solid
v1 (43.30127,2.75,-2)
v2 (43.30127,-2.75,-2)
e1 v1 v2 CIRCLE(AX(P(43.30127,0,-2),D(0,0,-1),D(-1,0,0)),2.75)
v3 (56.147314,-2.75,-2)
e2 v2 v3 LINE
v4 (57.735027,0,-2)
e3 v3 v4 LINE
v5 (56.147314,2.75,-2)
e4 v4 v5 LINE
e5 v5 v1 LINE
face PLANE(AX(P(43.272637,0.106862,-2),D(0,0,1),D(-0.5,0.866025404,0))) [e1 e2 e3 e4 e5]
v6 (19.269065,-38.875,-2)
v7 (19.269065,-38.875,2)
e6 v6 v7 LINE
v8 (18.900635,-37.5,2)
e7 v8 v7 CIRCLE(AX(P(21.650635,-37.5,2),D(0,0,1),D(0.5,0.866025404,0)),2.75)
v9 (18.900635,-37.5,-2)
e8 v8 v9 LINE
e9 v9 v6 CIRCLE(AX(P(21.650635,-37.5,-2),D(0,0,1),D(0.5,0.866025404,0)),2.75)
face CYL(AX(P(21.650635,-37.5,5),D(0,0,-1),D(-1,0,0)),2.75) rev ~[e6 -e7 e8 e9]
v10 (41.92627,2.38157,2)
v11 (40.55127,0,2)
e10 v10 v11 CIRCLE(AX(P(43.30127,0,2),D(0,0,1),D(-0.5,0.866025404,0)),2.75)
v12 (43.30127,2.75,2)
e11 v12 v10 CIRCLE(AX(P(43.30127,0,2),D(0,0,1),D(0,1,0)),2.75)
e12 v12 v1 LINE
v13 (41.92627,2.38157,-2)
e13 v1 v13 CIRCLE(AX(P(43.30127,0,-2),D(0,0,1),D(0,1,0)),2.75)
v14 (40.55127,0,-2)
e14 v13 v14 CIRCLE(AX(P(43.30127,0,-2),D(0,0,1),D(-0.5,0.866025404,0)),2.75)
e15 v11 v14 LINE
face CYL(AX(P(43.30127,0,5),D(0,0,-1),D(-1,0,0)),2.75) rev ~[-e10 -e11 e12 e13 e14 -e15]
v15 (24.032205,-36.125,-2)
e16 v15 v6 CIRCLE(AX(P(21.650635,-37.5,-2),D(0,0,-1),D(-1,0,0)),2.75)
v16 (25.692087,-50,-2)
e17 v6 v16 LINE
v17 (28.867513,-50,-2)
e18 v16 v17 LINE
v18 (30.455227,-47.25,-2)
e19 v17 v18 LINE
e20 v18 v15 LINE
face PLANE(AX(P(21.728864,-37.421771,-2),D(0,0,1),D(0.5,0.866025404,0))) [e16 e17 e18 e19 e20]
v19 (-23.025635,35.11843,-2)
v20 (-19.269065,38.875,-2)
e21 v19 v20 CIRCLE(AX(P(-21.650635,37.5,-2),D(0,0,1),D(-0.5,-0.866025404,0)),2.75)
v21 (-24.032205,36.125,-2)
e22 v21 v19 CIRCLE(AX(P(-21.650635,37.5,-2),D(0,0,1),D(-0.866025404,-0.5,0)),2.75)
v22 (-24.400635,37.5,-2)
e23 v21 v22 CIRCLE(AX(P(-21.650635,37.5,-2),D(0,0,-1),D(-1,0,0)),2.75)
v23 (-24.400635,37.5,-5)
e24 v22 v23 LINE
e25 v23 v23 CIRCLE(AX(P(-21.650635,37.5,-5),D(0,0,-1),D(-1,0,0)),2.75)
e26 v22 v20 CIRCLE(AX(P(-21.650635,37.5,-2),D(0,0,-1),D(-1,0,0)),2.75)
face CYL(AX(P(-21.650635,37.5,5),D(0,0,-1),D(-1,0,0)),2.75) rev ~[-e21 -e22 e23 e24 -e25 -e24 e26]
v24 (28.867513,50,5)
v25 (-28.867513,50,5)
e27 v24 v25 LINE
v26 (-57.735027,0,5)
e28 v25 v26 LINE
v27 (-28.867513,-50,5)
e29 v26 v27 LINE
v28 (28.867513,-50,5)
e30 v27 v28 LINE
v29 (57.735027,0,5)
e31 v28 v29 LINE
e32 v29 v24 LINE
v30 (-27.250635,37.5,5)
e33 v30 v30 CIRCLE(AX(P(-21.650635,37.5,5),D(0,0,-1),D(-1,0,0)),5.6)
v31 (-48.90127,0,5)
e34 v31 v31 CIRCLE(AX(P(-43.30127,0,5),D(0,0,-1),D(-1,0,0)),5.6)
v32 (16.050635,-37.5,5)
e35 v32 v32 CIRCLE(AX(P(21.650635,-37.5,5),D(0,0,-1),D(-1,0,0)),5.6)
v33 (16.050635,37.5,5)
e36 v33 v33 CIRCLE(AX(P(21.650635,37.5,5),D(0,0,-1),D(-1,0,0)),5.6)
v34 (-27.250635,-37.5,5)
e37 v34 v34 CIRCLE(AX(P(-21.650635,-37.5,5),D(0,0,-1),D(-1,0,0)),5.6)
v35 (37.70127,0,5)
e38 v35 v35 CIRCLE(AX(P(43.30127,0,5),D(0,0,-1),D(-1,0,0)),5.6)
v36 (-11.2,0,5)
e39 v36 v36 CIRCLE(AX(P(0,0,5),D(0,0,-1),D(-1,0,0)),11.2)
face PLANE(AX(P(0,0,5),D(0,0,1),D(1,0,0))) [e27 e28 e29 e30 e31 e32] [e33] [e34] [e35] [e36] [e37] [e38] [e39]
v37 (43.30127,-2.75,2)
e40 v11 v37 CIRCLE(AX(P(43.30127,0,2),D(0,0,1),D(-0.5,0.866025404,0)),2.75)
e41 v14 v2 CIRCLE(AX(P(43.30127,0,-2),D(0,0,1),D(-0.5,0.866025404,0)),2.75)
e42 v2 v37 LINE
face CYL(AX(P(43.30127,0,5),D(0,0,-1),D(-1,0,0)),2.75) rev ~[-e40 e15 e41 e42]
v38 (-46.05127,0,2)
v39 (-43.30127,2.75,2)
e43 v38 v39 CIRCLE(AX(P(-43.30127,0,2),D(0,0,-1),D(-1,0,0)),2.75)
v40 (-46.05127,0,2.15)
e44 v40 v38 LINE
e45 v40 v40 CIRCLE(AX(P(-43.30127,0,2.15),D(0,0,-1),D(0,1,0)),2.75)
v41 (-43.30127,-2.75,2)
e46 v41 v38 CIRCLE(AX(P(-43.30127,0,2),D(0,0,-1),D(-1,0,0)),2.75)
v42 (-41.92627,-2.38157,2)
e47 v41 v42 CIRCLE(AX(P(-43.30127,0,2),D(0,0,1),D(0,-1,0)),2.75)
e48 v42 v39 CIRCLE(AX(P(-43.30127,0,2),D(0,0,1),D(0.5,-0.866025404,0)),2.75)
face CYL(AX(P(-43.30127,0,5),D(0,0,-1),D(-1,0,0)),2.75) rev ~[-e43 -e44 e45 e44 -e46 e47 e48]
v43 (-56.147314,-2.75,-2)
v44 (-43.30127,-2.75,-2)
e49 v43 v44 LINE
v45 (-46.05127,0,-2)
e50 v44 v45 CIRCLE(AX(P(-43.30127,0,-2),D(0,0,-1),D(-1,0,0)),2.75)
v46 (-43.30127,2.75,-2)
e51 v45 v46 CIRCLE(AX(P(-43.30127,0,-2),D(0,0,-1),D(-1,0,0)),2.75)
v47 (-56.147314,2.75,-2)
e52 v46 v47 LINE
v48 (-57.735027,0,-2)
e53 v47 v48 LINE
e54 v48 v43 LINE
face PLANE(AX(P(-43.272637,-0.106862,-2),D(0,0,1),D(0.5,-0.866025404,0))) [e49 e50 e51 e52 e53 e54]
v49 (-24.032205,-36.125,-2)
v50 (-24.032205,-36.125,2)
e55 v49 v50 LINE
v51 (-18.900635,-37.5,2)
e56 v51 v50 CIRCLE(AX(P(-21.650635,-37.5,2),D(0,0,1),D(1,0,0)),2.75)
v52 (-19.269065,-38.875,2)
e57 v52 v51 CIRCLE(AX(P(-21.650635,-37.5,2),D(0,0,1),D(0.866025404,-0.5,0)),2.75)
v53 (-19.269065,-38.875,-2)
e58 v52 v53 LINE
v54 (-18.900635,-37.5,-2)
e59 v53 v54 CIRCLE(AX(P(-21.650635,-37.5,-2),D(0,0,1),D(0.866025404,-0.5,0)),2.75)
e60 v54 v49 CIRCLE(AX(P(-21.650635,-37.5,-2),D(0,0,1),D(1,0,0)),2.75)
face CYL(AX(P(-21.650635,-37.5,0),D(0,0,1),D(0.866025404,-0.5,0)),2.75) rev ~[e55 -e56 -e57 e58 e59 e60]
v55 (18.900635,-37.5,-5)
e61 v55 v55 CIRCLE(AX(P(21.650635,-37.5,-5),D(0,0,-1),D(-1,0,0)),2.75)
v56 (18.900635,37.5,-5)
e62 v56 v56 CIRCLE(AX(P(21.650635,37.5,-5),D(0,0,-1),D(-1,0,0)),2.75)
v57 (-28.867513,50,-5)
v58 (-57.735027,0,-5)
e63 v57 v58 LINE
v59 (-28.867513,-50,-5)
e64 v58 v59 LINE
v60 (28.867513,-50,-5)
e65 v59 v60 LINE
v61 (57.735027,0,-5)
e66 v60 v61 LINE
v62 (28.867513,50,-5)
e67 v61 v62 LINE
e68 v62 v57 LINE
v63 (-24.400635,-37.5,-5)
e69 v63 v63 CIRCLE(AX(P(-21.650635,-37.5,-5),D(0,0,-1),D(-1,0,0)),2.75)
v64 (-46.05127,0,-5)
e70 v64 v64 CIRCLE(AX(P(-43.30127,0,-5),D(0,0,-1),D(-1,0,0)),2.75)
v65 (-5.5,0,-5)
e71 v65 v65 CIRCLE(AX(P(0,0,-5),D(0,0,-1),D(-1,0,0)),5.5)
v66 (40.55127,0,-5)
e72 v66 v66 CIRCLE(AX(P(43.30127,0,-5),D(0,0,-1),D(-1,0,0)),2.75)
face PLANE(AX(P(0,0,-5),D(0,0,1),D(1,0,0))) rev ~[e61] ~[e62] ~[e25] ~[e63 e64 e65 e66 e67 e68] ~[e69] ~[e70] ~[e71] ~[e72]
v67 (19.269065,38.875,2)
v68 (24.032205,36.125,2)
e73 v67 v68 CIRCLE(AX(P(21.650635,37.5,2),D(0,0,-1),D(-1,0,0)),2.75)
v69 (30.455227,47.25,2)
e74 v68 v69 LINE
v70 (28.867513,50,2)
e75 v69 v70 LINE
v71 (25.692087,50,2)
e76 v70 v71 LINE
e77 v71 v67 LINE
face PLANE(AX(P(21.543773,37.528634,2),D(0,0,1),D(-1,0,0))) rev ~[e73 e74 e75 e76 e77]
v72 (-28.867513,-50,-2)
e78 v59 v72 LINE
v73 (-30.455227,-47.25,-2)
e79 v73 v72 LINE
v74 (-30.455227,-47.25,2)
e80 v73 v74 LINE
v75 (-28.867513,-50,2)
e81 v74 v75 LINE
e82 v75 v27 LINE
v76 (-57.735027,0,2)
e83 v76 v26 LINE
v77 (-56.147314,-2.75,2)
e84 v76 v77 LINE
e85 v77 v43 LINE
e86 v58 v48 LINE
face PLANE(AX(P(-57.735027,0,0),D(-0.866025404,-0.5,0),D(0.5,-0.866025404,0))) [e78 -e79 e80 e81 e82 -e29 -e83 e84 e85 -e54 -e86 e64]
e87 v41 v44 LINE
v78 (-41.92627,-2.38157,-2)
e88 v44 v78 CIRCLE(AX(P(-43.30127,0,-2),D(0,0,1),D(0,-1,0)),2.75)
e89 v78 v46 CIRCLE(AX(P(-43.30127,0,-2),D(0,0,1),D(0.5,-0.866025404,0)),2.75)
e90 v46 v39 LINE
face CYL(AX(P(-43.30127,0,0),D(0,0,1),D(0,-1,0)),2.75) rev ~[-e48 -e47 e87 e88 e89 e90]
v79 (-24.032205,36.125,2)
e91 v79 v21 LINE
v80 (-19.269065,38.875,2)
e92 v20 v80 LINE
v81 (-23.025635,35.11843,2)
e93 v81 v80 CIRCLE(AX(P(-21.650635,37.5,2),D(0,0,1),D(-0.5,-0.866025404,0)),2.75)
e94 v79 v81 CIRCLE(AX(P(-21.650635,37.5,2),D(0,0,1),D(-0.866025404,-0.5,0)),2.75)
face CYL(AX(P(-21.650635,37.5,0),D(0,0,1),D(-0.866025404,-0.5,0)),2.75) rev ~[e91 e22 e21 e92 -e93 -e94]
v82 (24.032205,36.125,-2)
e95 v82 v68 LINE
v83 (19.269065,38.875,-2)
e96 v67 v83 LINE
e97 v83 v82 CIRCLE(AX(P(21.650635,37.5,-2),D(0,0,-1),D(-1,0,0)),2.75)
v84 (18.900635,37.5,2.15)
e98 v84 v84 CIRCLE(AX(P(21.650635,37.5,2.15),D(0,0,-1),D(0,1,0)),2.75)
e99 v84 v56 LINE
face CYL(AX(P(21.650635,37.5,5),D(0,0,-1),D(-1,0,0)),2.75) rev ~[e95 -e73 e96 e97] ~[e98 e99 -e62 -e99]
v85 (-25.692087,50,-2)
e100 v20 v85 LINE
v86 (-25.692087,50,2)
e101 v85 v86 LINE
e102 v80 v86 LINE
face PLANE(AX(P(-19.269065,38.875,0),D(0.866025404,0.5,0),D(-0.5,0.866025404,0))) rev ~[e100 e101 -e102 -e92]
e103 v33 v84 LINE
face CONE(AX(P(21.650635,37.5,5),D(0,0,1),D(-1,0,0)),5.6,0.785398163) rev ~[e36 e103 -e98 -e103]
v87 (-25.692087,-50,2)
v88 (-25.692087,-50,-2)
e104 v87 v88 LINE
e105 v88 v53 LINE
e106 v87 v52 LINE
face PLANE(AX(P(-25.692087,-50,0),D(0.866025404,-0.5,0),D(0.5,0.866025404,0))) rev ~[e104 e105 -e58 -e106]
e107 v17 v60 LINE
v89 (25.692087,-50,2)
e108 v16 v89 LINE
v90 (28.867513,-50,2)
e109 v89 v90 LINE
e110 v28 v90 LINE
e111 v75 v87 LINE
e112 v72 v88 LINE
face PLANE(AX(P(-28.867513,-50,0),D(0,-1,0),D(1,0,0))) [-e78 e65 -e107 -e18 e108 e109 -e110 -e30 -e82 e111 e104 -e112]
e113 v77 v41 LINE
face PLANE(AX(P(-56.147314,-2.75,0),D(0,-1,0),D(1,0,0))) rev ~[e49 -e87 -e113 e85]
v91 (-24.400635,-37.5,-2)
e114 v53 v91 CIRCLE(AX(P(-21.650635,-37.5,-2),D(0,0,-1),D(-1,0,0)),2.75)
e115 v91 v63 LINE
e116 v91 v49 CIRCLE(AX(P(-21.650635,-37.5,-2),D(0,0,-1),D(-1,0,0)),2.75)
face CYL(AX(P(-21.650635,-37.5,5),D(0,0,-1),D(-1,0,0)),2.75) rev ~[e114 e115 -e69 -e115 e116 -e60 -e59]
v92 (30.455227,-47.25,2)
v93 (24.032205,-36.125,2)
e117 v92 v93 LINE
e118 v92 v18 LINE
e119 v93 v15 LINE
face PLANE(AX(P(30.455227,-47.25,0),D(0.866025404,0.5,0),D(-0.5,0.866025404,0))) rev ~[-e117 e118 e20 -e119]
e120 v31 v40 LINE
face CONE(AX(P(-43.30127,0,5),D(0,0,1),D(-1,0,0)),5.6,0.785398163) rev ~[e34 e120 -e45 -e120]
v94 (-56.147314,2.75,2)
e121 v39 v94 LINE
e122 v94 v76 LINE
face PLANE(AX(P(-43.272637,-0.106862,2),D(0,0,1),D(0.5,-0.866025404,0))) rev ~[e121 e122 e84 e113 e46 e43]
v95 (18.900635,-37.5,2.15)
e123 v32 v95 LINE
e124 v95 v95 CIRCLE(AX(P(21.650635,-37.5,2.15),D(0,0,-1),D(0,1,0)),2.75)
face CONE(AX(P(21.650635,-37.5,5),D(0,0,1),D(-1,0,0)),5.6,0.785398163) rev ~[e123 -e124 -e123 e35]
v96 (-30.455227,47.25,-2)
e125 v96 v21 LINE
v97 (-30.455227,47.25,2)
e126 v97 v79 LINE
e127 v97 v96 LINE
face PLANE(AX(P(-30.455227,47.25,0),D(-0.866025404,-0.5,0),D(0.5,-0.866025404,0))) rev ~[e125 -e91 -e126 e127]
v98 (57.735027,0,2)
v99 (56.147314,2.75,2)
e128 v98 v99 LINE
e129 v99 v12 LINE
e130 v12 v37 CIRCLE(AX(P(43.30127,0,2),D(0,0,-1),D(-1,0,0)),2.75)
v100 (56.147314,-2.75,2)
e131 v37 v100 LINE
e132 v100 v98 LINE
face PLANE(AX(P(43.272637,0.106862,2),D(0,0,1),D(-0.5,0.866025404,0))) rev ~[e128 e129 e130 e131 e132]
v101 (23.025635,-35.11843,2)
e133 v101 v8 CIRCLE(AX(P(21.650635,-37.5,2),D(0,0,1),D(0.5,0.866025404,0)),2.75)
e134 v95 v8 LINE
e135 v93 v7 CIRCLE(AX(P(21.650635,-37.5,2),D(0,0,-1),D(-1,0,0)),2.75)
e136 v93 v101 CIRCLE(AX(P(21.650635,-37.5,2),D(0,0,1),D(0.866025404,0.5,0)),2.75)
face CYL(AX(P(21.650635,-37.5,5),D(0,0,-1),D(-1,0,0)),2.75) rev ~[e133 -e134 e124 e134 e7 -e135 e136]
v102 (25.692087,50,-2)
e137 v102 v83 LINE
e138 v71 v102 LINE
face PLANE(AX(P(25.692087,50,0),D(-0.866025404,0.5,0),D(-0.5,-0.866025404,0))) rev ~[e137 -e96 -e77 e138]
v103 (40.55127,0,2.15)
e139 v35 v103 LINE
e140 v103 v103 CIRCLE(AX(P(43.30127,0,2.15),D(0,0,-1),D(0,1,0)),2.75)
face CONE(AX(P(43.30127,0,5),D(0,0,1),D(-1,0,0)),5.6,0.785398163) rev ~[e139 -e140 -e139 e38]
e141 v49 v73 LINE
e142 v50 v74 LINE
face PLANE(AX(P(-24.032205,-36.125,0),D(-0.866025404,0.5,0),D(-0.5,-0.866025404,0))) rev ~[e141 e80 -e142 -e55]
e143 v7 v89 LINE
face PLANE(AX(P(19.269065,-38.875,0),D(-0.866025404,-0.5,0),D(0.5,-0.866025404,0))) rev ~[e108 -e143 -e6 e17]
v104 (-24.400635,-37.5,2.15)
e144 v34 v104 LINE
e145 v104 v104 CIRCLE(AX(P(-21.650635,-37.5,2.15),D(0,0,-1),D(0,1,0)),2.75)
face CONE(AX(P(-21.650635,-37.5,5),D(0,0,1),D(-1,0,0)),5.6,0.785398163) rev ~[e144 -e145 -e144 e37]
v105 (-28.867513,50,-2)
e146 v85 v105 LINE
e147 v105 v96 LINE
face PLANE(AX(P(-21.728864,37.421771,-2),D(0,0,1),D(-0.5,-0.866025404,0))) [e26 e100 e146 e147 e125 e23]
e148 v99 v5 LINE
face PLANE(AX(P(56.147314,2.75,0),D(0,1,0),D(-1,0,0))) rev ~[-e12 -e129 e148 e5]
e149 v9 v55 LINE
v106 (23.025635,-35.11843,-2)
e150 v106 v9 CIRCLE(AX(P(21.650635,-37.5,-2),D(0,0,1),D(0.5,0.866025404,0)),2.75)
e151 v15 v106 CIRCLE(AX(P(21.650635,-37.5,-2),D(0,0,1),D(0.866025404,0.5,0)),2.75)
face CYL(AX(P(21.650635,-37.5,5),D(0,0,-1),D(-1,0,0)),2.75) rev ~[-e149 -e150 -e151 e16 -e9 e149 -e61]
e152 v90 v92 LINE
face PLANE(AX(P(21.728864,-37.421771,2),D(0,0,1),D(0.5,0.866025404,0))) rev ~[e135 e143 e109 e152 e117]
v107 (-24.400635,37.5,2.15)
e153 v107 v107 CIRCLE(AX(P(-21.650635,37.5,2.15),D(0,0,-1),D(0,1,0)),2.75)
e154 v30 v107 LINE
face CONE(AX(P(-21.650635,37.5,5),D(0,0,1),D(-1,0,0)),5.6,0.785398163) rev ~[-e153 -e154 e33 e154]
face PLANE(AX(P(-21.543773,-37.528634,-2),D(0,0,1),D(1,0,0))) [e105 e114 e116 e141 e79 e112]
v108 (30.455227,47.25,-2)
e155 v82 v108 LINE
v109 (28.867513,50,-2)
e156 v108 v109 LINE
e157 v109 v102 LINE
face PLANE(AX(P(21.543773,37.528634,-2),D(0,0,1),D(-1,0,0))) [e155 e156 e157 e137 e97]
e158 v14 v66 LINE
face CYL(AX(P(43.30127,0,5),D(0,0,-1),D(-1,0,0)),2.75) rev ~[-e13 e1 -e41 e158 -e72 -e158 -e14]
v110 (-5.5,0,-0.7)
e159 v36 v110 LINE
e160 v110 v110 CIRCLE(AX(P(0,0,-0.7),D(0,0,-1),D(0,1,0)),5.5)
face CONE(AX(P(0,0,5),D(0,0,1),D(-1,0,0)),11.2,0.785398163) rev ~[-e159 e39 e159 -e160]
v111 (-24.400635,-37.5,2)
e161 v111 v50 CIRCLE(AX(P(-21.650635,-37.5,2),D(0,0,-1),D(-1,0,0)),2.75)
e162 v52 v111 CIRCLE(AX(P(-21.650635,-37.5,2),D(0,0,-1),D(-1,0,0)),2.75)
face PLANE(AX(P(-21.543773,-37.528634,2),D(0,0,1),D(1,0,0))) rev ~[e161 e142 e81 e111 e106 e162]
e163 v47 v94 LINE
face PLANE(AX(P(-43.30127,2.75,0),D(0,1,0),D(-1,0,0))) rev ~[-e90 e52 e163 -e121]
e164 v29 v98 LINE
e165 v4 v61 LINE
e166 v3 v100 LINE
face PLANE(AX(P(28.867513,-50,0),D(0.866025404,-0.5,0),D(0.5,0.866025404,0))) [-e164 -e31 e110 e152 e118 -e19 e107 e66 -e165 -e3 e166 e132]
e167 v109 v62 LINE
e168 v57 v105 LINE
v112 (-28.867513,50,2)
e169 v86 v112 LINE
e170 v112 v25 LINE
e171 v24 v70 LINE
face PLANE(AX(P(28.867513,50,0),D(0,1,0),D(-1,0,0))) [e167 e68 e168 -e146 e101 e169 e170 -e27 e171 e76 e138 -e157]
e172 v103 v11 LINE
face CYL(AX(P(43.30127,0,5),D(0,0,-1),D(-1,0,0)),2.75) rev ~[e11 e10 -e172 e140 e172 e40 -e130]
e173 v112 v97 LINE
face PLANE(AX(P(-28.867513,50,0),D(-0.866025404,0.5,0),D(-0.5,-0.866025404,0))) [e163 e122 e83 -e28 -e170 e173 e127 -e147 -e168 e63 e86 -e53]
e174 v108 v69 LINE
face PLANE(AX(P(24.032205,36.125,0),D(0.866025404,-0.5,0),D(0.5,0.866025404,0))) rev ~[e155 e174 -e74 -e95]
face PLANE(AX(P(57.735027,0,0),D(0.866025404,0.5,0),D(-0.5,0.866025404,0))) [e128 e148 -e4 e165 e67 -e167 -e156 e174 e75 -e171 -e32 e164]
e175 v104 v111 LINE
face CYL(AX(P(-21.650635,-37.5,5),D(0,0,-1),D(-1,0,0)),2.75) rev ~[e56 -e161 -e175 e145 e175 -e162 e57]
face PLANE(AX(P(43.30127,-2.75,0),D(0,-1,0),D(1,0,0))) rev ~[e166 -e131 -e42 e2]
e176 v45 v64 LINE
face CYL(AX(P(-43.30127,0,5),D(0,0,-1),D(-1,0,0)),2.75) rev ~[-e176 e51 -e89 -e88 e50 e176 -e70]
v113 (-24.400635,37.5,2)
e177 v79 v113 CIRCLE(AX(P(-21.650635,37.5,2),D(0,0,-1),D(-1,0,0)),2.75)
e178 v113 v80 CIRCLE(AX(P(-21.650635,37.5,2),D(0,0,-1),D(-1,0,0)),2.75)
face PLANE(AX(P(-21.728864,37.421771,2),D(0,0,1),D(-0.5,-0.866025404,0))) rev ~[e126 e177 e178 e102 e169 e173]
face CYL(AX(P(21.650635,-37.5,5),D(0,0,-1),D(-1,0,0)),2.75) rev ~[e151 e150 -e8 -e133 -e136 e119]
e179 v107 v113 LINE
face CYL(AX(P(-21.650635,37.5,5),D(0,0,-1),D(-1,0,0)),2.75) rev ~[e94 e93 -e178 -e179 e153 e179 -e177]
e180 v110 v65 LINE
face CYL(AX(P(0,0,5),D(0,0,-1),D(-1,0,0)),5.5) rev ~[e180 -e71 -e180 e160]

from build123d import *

# Parameters (mm, degrees)
F1_DEPTH        = 5
F4_D            = 11
F4_DEPTH        = 57.15
F4_CSINK_D      = 22.4
F4_CSINK_ANGLE  = 90
F4_TIP          = 3.3047334047
F5_D            = 5.5
F5_DEPTH        = 57.15
F5_CSINK_D      = 11.2
F5_CSINK_ANGLE  = 90
F5_TIP          = 1.6523667023
F7_DEPTH        = 2
F7_COPIES_COUNT = 6


# Not quite as in the source:
# - a pattern or mirror of a feature is missing from the dataset's text; its kind, count and spacing are read off the source's solid


with BuildPart() as f1:
    # F0 (on Top) → F1 (new body, symmetric)
    with BuildSketch(Plane.XY):
        Polygon((28.8675134595, 50), (-28.8675134595, 50), (-57.735026919, 0), (-28.8675134595, -50), (28.8675134595, -50), (57.735026919, 0), align=None)
    extrude(amount=F1_DEPTH, both=True)

    # F4
    with Locations(Plane.XY.offset(5)):
        with Locations((0, 0)):
            CounterSinkHole(F4_D / 2, F4_CSINK_D / 2, depth=F4_DEPTH, counter_sink_angle=F4_CSINK_ANGLE)
            with Locations((0, 0, -(F4_DEPTH + F4_TIP / 2))):  # 118° drill point
                Cone(0, F4_D / 2, F4_TIP, mode=Mode.SUBTRACT)

    # F5
    with Locations(Plane.XY.offset(5)):
        with Locations((21.6506350946, 37.5), (43.3012701892, 0), (21.6506350946, -37.5), (-21.6506350946, -37.5), (-43.3012701892, 0), (-21.6506350946, 37.5)):
            CounterSinkHole(F5_D / 2, F5_CSINK_D / 2, depth=F5_DEPTH, counter_sink_angle=F5_CSINK_ANGLE)
            with Locations((0, 0, -(F5_DEPTH + F5_TIP / 2))):  # 118° drill point
                Cone(0, F5_D / 2, F5_TIP, mode=Mode.SUBTRACT)

    # F6 (on Top) → F7 (cut, symmetric)
    with BuildSketch(Plane.XY):
        with BuildLine():
            ThreePointArc((-19.2690652342, -38.875), (-18.9943390723, -38.211752374), (-18.9006350946, -37.5))
            ThreePointArc((-18.9006350946, -37.5), (-20.9388827206, -34.8437039777), (-24.032204955, -36.125))
            ThreePointArc((-24.032204955, -36.125), (-23.0256350946, -39.8815698604), (-19.2690652342, -38.875))
        make_face()
        with BuildLine():
            ThreePointArc((-19.2690652342, -38.875), (-23.0256350946, -39.8815698604), (-24.032204955, -36.125))
            Line((-24.032204955, -36.125), (-30.4552266998, -47.25))
            Line((-30.4552266998, -47.25), (-28.8675134595, -50))
            Line((-28.8675134595, -50), (-25.6920869789, -50))
            Line((-25.6920869789, -50), (-19.2690652342, -38.875))
        make_face()
    f7 = extrude(amount=F7_DEPTH, both=True, mode=Mode.SUBTRACT)

    # F7_copies: F7 ×6 about axis
    f7_copies_axis = Axis((0, 0, 0), (0, 0, 1))
    for i in range(1, F7_COPIES_COUNT):
        add(f7.rotate(f7_copies_axis, i * 360 / F7_COPIES_COUNT), mode=Mode.SUBTRACT)


solid = f1.part
